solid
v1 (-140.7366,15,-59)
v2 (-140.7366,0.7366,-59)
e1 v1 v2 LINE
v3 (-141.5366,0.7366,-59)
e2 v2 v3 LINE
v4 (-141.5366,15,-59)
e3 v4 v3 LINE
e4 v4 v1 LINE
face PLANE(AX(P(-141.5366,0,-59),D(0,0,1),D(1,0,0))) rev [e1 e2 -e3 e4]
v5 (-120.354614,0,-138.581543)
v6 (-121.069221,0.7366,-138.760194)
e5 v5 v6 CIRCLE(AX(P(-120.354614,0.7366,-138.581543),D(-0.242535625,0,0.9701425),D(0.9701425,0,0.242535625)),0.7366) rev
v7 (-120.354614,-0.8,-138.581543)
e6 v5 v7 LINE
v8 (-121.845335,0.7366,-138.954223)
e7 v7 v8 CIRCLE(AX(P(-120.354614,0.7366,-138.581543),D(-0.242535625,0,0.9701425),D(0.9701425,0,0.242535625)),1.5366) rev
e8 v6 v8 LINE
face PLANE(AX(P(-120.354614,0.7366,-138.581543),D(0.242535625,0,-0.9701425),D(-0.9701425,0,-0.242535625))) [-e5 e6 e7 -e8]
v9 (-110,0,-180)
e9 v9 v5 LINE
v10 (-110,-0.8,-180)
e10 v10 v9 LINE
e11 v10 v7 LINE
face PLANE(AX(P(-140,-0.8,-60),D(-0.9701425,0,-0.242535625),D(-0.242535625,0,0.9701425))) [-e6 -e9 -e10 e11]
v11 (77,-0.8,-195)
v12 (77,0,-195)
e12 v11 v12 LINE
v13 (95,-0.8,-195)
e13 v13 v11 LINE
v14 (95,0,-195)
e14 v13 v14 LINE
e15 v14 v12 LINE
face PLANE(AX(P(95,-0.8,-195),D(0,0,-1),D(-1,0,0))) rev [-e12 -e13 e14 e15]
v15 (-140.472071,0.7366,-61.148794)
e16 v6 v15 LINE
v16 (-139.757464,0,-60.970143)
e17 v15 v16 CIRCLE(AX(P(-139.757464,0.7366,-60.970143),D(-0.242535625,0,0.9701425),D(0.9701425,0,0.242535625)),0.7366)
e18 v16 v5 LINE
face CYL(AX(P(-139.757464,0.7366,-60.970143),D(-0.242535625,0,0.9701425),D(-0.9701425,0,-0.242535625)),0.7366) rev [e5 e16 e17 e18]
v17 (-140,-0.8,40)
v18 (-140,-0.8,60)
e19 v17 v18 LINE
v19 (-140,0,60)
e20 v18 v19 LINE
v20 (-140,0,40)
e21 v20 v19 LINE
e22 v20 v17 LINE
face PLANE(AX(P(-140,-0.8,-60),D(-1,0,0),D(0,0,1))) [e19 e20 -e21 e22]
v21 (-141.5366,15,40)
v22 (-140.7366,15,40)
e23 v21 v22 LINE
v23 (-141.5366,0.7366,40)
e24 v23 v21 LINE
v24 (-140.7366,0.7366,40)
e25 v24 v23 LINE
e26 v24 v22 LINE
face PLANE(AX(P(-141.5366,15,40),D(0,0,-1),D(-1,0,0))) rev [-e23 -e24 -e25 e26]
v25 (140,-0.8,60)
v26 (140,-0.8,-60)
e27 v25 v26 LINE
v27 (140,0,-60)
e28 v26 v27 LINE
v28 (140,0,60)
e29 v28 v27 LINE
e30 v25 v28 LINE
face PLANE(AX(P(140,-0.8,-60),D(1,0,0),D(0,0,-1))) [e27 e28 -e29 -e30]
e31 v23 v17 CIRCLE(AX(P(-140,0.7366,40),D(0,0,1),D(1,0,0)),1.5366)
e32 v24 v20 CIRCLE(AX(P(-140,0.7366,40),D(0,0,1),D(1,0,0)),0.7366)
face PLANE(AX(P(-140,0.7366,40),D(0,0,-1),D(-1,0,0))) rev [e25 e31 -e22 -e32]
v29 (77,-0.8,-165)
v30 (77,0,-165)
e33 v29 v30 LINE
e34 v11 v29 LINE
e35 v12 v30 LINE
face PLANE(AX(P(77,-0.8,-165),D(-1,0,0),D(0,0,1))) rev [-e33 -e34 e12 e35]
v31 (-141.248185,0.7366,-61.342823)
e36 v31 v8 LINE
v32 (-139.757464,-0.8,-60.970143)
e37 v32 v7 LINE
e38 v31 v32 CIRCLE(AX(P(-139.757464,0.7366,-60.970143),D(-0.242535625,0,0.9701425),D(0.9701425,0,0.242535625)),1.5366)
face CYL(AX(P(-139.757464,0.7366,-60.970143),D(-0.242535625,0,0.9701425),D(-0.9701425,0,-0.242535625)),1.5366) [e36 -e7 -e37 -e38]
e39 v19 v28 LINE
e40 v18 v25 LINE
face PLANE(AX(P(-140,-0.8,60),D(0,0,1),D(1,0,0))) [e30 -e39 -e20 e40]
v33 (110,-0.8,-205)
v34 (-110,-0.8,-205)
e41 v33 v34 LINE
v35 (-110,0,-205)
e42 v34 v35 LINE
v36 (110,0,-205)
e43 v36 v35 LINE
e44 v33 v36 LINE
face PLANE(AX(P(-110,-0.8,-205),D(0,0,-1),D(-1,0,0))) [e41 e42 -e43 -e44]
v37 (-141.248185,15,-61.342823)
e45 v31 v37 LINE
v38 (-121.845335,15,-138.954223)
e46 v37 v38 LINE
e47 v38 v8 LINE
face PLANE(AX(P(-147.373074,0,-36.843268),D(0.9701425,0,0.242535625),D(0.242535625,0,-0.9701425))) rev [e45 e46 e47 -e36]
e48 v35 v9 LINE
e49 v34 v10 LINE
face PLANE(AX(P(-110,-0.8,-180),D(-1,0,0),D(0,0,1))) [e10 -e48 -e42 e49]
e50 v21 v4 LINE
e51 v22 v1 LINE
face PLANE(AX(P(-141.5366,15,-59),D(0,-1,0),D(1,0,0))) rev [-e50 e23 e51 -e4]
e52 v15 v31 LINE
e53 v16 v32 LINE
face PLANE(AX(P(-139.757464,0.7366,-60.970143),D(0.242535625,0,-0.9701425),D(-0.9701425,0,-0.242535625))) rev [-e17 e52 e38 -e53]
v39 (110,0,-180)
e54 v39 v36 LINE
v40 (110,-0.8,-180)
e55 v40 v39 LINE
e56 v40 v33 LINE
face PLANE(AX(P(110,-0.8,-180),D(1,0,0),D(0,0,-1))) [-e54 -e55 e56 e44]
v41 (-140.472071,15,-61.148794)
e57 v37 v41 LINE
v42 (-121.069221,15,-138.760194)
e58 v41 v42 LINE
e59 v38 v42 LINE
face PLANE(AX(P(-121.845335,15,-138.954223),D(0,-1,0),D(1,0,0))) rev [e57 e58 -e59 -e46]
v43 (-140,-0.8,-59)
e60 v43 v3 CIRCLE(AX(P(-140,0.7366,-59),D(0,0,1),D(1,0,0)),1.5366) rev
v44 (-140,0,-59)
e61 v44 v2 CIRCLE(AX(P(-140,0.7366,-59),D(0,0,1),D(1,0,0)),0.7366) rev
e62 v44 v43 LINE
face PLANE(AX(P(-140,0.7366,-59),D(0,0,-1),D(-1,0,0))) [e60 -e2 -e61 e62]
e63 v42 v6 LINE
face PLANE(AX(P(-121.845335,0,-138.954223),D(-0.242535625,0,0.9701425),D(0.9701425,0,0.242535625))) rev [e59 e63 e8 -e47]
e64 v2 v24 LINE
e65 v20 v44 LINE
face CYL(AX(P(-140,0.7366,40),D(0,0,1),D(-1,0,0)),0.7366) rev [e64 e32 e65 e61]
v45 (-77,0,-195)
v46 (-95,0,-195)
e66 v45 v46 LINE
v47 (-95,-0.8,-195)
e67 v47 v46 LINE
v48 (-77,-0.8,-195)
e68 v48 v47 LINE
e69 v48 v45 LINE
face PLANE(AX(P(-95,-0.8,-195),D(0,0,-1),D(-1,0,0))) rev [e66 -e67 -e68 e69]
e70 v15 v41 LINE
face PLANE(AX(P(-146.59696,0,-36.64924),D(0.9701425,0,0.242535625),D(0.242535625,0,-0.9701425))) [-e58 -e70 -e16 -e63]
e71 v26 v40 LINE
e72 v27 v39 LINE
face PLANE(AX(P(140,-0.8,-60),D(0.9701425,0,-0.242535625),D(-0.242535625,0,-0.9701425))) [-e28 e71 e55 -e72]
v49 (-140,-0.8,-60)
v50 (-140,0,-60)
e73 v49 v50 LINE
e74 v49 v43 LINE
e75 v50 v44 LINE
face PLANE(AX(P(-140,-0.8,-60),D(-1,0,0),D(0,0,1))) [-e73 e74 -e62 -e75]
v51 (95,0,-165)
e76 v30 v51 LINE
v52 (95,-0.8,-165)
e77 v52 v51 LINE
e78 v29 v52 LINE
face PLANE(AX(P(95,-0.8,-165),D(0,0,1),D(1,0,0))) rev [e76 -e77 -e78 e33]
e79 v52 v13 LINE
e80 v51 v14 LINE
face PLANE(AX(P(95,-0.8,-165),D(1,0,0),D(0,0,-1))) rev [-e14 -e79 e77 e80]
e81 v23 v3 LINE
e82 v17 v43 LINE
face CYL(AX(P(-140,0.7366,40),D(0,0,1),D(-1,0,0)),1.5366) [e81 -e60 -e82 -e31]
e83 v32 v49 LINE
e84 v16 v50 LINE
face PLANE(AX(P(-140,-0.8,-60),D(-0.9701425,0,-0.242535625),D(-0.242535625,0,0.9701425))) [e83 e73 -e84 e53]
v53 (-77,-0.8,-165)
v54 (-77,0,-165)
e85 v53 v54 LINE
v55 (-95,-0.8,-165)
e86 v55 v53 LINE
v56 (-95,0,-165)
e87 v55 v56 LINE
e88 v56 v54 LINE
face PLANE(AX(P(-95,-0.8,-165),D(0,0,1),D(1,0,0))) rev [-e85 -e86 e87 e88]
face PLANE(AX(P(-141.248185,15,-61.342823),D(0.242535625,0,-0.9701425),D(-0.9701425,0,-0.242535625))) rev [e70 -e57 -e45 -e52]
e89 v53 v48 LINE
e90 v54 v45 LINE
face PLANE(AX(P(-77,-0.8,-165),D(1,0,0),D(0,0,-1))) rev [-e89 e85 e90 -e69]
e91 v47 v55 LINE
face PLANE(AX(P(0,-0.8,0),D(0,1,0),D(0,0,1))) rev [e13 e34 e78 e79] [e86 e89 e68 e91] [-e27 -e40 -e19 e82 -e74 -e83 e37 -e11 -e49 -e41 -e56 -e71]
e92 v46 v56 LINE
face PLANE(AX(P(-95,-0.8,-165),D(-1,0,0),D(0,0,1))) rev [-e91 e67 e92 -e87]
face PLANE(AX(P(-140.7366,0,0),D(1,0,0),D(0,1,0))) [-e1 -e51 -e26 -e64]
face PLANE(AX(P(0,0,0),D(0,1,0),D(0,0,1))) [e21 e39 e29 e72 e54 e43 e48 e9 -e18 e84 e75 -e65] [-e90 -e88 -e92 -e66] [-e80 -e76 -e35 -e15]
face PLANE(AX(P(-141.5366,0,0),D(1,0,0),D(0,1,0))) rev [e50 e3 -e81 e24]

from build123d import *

# Parameters (mm, degrees)
SKETCH7_W          = 280
SKETCH7_H          = 120
BASE_FLANGE4_DEPTH = 0.8
TAB2_DEPTH         = 0.8
SKETCH11_W         = 18
SKETCH11_H         = 30
CUT_EXTRUDE1_DEPTH = 249.245120798
EDGE_FLANGE1_DEPTH = 99
EDGE_FLANGE2_DEPTH = 80


# Sheet-metal steps are written as plain solids
with BuildPart() as part:
    # Sketch7 → Base-Flange4 (new body)
    with BuildSketch(Plane(origin=(0, 0, 0), x_dir=(1, 0, 0), z_dir=(0, 1, 0))):
        Rectangle(SKETCH7_W, SKETCH7_H)
    extrude(amount=-BASE_FLANGE4_DEPTH)

    # Sketch10 → Tab2 (add)
    with BuildSketch(Plane(origin=(0, 0, 0), x_dir=(1, 0, 0), z_dir=(0, 1, 0))):
        Polygon((140, 60), (-140, 60), (-110, 180), (-110, 205), (110, 205), (110, 180), align=None)
    extrude(amount=-TAB2_DEPTH)

    # Sketch11 → Cut-Extrude1 (cut, through all)
    with BuildSketch(Plane(origin=(0, 0, 0), x_dir=(1, 0, 0), z_dir=(0, 1, 0))):
        with Locations((-86, 180)):
            Rectangle(SKETCH11_W, SKETCH11_H)
        with Locations((86, 180)):
            Rectangle(SKETCH11_W, SKETCH11_H)
    extrude(amount=-CUT_EXTRUDE1_DEPTH, mode=Mode.SUBTRACT)

    # Edge-Flange1 section (across the edge) → Edge-Flange1 (add)
    with BuildSketch(Plane(origin=(-140.7366, 0, -59), x_dir=(1, 0, 0), z_dir=(0, 0, 1))):
        with BuildLine():
            Line((-0.8, 0.7366), (-0.8, 15))
            Line((-0.8, 15), (0, 15))
            Line((0, 15), (0, 0.7366))
            ThreePointArc((0, 0.7366), (0.215745145, 0.215745145), (0.7366, 0))
            Line((0.7366, 0), (0.7366, -0.8))
            ThreePointArc((0.7366, -0.8), (-0.34994028, -0.34994028), (-0.8, 0.7366))
        make_face()
    extrude(amount=EDGE_FLANGE1_DEPTH)

    # Edge-Flange2 section (across the edge) → Edge-Flange2 (add)
    with BuildSketch(Plane(origin=(-121.069221338, 0, -138.760194253), x_dir=(0.9701425001453319, 3.4914813388431334e-15, 0.24253562503633339), z_dir=(-0.24253562503633339, 0, 0.9701425001453319))):
        with BuildLine():
            Line((-0.8, 0.7366), (-0.8, 15))
            Line((-0.8, 15), (0, 15))
            Line((0, 15), (0, 0.7366))
            ThreePointArc((0, 0.7366), (0.215745145, 0.215745145), (0.7366, 0))
            Line((0.7366, 0), (0.7366, -0.8))
            ThreePointArc((0.7366, -0.8), (-0.34994028, -0.34994028), (-0.8, 0.7366))
        make_face()
    extrude(amount=EDGE_FLANGE2_DEPTH)


solid = part.part
